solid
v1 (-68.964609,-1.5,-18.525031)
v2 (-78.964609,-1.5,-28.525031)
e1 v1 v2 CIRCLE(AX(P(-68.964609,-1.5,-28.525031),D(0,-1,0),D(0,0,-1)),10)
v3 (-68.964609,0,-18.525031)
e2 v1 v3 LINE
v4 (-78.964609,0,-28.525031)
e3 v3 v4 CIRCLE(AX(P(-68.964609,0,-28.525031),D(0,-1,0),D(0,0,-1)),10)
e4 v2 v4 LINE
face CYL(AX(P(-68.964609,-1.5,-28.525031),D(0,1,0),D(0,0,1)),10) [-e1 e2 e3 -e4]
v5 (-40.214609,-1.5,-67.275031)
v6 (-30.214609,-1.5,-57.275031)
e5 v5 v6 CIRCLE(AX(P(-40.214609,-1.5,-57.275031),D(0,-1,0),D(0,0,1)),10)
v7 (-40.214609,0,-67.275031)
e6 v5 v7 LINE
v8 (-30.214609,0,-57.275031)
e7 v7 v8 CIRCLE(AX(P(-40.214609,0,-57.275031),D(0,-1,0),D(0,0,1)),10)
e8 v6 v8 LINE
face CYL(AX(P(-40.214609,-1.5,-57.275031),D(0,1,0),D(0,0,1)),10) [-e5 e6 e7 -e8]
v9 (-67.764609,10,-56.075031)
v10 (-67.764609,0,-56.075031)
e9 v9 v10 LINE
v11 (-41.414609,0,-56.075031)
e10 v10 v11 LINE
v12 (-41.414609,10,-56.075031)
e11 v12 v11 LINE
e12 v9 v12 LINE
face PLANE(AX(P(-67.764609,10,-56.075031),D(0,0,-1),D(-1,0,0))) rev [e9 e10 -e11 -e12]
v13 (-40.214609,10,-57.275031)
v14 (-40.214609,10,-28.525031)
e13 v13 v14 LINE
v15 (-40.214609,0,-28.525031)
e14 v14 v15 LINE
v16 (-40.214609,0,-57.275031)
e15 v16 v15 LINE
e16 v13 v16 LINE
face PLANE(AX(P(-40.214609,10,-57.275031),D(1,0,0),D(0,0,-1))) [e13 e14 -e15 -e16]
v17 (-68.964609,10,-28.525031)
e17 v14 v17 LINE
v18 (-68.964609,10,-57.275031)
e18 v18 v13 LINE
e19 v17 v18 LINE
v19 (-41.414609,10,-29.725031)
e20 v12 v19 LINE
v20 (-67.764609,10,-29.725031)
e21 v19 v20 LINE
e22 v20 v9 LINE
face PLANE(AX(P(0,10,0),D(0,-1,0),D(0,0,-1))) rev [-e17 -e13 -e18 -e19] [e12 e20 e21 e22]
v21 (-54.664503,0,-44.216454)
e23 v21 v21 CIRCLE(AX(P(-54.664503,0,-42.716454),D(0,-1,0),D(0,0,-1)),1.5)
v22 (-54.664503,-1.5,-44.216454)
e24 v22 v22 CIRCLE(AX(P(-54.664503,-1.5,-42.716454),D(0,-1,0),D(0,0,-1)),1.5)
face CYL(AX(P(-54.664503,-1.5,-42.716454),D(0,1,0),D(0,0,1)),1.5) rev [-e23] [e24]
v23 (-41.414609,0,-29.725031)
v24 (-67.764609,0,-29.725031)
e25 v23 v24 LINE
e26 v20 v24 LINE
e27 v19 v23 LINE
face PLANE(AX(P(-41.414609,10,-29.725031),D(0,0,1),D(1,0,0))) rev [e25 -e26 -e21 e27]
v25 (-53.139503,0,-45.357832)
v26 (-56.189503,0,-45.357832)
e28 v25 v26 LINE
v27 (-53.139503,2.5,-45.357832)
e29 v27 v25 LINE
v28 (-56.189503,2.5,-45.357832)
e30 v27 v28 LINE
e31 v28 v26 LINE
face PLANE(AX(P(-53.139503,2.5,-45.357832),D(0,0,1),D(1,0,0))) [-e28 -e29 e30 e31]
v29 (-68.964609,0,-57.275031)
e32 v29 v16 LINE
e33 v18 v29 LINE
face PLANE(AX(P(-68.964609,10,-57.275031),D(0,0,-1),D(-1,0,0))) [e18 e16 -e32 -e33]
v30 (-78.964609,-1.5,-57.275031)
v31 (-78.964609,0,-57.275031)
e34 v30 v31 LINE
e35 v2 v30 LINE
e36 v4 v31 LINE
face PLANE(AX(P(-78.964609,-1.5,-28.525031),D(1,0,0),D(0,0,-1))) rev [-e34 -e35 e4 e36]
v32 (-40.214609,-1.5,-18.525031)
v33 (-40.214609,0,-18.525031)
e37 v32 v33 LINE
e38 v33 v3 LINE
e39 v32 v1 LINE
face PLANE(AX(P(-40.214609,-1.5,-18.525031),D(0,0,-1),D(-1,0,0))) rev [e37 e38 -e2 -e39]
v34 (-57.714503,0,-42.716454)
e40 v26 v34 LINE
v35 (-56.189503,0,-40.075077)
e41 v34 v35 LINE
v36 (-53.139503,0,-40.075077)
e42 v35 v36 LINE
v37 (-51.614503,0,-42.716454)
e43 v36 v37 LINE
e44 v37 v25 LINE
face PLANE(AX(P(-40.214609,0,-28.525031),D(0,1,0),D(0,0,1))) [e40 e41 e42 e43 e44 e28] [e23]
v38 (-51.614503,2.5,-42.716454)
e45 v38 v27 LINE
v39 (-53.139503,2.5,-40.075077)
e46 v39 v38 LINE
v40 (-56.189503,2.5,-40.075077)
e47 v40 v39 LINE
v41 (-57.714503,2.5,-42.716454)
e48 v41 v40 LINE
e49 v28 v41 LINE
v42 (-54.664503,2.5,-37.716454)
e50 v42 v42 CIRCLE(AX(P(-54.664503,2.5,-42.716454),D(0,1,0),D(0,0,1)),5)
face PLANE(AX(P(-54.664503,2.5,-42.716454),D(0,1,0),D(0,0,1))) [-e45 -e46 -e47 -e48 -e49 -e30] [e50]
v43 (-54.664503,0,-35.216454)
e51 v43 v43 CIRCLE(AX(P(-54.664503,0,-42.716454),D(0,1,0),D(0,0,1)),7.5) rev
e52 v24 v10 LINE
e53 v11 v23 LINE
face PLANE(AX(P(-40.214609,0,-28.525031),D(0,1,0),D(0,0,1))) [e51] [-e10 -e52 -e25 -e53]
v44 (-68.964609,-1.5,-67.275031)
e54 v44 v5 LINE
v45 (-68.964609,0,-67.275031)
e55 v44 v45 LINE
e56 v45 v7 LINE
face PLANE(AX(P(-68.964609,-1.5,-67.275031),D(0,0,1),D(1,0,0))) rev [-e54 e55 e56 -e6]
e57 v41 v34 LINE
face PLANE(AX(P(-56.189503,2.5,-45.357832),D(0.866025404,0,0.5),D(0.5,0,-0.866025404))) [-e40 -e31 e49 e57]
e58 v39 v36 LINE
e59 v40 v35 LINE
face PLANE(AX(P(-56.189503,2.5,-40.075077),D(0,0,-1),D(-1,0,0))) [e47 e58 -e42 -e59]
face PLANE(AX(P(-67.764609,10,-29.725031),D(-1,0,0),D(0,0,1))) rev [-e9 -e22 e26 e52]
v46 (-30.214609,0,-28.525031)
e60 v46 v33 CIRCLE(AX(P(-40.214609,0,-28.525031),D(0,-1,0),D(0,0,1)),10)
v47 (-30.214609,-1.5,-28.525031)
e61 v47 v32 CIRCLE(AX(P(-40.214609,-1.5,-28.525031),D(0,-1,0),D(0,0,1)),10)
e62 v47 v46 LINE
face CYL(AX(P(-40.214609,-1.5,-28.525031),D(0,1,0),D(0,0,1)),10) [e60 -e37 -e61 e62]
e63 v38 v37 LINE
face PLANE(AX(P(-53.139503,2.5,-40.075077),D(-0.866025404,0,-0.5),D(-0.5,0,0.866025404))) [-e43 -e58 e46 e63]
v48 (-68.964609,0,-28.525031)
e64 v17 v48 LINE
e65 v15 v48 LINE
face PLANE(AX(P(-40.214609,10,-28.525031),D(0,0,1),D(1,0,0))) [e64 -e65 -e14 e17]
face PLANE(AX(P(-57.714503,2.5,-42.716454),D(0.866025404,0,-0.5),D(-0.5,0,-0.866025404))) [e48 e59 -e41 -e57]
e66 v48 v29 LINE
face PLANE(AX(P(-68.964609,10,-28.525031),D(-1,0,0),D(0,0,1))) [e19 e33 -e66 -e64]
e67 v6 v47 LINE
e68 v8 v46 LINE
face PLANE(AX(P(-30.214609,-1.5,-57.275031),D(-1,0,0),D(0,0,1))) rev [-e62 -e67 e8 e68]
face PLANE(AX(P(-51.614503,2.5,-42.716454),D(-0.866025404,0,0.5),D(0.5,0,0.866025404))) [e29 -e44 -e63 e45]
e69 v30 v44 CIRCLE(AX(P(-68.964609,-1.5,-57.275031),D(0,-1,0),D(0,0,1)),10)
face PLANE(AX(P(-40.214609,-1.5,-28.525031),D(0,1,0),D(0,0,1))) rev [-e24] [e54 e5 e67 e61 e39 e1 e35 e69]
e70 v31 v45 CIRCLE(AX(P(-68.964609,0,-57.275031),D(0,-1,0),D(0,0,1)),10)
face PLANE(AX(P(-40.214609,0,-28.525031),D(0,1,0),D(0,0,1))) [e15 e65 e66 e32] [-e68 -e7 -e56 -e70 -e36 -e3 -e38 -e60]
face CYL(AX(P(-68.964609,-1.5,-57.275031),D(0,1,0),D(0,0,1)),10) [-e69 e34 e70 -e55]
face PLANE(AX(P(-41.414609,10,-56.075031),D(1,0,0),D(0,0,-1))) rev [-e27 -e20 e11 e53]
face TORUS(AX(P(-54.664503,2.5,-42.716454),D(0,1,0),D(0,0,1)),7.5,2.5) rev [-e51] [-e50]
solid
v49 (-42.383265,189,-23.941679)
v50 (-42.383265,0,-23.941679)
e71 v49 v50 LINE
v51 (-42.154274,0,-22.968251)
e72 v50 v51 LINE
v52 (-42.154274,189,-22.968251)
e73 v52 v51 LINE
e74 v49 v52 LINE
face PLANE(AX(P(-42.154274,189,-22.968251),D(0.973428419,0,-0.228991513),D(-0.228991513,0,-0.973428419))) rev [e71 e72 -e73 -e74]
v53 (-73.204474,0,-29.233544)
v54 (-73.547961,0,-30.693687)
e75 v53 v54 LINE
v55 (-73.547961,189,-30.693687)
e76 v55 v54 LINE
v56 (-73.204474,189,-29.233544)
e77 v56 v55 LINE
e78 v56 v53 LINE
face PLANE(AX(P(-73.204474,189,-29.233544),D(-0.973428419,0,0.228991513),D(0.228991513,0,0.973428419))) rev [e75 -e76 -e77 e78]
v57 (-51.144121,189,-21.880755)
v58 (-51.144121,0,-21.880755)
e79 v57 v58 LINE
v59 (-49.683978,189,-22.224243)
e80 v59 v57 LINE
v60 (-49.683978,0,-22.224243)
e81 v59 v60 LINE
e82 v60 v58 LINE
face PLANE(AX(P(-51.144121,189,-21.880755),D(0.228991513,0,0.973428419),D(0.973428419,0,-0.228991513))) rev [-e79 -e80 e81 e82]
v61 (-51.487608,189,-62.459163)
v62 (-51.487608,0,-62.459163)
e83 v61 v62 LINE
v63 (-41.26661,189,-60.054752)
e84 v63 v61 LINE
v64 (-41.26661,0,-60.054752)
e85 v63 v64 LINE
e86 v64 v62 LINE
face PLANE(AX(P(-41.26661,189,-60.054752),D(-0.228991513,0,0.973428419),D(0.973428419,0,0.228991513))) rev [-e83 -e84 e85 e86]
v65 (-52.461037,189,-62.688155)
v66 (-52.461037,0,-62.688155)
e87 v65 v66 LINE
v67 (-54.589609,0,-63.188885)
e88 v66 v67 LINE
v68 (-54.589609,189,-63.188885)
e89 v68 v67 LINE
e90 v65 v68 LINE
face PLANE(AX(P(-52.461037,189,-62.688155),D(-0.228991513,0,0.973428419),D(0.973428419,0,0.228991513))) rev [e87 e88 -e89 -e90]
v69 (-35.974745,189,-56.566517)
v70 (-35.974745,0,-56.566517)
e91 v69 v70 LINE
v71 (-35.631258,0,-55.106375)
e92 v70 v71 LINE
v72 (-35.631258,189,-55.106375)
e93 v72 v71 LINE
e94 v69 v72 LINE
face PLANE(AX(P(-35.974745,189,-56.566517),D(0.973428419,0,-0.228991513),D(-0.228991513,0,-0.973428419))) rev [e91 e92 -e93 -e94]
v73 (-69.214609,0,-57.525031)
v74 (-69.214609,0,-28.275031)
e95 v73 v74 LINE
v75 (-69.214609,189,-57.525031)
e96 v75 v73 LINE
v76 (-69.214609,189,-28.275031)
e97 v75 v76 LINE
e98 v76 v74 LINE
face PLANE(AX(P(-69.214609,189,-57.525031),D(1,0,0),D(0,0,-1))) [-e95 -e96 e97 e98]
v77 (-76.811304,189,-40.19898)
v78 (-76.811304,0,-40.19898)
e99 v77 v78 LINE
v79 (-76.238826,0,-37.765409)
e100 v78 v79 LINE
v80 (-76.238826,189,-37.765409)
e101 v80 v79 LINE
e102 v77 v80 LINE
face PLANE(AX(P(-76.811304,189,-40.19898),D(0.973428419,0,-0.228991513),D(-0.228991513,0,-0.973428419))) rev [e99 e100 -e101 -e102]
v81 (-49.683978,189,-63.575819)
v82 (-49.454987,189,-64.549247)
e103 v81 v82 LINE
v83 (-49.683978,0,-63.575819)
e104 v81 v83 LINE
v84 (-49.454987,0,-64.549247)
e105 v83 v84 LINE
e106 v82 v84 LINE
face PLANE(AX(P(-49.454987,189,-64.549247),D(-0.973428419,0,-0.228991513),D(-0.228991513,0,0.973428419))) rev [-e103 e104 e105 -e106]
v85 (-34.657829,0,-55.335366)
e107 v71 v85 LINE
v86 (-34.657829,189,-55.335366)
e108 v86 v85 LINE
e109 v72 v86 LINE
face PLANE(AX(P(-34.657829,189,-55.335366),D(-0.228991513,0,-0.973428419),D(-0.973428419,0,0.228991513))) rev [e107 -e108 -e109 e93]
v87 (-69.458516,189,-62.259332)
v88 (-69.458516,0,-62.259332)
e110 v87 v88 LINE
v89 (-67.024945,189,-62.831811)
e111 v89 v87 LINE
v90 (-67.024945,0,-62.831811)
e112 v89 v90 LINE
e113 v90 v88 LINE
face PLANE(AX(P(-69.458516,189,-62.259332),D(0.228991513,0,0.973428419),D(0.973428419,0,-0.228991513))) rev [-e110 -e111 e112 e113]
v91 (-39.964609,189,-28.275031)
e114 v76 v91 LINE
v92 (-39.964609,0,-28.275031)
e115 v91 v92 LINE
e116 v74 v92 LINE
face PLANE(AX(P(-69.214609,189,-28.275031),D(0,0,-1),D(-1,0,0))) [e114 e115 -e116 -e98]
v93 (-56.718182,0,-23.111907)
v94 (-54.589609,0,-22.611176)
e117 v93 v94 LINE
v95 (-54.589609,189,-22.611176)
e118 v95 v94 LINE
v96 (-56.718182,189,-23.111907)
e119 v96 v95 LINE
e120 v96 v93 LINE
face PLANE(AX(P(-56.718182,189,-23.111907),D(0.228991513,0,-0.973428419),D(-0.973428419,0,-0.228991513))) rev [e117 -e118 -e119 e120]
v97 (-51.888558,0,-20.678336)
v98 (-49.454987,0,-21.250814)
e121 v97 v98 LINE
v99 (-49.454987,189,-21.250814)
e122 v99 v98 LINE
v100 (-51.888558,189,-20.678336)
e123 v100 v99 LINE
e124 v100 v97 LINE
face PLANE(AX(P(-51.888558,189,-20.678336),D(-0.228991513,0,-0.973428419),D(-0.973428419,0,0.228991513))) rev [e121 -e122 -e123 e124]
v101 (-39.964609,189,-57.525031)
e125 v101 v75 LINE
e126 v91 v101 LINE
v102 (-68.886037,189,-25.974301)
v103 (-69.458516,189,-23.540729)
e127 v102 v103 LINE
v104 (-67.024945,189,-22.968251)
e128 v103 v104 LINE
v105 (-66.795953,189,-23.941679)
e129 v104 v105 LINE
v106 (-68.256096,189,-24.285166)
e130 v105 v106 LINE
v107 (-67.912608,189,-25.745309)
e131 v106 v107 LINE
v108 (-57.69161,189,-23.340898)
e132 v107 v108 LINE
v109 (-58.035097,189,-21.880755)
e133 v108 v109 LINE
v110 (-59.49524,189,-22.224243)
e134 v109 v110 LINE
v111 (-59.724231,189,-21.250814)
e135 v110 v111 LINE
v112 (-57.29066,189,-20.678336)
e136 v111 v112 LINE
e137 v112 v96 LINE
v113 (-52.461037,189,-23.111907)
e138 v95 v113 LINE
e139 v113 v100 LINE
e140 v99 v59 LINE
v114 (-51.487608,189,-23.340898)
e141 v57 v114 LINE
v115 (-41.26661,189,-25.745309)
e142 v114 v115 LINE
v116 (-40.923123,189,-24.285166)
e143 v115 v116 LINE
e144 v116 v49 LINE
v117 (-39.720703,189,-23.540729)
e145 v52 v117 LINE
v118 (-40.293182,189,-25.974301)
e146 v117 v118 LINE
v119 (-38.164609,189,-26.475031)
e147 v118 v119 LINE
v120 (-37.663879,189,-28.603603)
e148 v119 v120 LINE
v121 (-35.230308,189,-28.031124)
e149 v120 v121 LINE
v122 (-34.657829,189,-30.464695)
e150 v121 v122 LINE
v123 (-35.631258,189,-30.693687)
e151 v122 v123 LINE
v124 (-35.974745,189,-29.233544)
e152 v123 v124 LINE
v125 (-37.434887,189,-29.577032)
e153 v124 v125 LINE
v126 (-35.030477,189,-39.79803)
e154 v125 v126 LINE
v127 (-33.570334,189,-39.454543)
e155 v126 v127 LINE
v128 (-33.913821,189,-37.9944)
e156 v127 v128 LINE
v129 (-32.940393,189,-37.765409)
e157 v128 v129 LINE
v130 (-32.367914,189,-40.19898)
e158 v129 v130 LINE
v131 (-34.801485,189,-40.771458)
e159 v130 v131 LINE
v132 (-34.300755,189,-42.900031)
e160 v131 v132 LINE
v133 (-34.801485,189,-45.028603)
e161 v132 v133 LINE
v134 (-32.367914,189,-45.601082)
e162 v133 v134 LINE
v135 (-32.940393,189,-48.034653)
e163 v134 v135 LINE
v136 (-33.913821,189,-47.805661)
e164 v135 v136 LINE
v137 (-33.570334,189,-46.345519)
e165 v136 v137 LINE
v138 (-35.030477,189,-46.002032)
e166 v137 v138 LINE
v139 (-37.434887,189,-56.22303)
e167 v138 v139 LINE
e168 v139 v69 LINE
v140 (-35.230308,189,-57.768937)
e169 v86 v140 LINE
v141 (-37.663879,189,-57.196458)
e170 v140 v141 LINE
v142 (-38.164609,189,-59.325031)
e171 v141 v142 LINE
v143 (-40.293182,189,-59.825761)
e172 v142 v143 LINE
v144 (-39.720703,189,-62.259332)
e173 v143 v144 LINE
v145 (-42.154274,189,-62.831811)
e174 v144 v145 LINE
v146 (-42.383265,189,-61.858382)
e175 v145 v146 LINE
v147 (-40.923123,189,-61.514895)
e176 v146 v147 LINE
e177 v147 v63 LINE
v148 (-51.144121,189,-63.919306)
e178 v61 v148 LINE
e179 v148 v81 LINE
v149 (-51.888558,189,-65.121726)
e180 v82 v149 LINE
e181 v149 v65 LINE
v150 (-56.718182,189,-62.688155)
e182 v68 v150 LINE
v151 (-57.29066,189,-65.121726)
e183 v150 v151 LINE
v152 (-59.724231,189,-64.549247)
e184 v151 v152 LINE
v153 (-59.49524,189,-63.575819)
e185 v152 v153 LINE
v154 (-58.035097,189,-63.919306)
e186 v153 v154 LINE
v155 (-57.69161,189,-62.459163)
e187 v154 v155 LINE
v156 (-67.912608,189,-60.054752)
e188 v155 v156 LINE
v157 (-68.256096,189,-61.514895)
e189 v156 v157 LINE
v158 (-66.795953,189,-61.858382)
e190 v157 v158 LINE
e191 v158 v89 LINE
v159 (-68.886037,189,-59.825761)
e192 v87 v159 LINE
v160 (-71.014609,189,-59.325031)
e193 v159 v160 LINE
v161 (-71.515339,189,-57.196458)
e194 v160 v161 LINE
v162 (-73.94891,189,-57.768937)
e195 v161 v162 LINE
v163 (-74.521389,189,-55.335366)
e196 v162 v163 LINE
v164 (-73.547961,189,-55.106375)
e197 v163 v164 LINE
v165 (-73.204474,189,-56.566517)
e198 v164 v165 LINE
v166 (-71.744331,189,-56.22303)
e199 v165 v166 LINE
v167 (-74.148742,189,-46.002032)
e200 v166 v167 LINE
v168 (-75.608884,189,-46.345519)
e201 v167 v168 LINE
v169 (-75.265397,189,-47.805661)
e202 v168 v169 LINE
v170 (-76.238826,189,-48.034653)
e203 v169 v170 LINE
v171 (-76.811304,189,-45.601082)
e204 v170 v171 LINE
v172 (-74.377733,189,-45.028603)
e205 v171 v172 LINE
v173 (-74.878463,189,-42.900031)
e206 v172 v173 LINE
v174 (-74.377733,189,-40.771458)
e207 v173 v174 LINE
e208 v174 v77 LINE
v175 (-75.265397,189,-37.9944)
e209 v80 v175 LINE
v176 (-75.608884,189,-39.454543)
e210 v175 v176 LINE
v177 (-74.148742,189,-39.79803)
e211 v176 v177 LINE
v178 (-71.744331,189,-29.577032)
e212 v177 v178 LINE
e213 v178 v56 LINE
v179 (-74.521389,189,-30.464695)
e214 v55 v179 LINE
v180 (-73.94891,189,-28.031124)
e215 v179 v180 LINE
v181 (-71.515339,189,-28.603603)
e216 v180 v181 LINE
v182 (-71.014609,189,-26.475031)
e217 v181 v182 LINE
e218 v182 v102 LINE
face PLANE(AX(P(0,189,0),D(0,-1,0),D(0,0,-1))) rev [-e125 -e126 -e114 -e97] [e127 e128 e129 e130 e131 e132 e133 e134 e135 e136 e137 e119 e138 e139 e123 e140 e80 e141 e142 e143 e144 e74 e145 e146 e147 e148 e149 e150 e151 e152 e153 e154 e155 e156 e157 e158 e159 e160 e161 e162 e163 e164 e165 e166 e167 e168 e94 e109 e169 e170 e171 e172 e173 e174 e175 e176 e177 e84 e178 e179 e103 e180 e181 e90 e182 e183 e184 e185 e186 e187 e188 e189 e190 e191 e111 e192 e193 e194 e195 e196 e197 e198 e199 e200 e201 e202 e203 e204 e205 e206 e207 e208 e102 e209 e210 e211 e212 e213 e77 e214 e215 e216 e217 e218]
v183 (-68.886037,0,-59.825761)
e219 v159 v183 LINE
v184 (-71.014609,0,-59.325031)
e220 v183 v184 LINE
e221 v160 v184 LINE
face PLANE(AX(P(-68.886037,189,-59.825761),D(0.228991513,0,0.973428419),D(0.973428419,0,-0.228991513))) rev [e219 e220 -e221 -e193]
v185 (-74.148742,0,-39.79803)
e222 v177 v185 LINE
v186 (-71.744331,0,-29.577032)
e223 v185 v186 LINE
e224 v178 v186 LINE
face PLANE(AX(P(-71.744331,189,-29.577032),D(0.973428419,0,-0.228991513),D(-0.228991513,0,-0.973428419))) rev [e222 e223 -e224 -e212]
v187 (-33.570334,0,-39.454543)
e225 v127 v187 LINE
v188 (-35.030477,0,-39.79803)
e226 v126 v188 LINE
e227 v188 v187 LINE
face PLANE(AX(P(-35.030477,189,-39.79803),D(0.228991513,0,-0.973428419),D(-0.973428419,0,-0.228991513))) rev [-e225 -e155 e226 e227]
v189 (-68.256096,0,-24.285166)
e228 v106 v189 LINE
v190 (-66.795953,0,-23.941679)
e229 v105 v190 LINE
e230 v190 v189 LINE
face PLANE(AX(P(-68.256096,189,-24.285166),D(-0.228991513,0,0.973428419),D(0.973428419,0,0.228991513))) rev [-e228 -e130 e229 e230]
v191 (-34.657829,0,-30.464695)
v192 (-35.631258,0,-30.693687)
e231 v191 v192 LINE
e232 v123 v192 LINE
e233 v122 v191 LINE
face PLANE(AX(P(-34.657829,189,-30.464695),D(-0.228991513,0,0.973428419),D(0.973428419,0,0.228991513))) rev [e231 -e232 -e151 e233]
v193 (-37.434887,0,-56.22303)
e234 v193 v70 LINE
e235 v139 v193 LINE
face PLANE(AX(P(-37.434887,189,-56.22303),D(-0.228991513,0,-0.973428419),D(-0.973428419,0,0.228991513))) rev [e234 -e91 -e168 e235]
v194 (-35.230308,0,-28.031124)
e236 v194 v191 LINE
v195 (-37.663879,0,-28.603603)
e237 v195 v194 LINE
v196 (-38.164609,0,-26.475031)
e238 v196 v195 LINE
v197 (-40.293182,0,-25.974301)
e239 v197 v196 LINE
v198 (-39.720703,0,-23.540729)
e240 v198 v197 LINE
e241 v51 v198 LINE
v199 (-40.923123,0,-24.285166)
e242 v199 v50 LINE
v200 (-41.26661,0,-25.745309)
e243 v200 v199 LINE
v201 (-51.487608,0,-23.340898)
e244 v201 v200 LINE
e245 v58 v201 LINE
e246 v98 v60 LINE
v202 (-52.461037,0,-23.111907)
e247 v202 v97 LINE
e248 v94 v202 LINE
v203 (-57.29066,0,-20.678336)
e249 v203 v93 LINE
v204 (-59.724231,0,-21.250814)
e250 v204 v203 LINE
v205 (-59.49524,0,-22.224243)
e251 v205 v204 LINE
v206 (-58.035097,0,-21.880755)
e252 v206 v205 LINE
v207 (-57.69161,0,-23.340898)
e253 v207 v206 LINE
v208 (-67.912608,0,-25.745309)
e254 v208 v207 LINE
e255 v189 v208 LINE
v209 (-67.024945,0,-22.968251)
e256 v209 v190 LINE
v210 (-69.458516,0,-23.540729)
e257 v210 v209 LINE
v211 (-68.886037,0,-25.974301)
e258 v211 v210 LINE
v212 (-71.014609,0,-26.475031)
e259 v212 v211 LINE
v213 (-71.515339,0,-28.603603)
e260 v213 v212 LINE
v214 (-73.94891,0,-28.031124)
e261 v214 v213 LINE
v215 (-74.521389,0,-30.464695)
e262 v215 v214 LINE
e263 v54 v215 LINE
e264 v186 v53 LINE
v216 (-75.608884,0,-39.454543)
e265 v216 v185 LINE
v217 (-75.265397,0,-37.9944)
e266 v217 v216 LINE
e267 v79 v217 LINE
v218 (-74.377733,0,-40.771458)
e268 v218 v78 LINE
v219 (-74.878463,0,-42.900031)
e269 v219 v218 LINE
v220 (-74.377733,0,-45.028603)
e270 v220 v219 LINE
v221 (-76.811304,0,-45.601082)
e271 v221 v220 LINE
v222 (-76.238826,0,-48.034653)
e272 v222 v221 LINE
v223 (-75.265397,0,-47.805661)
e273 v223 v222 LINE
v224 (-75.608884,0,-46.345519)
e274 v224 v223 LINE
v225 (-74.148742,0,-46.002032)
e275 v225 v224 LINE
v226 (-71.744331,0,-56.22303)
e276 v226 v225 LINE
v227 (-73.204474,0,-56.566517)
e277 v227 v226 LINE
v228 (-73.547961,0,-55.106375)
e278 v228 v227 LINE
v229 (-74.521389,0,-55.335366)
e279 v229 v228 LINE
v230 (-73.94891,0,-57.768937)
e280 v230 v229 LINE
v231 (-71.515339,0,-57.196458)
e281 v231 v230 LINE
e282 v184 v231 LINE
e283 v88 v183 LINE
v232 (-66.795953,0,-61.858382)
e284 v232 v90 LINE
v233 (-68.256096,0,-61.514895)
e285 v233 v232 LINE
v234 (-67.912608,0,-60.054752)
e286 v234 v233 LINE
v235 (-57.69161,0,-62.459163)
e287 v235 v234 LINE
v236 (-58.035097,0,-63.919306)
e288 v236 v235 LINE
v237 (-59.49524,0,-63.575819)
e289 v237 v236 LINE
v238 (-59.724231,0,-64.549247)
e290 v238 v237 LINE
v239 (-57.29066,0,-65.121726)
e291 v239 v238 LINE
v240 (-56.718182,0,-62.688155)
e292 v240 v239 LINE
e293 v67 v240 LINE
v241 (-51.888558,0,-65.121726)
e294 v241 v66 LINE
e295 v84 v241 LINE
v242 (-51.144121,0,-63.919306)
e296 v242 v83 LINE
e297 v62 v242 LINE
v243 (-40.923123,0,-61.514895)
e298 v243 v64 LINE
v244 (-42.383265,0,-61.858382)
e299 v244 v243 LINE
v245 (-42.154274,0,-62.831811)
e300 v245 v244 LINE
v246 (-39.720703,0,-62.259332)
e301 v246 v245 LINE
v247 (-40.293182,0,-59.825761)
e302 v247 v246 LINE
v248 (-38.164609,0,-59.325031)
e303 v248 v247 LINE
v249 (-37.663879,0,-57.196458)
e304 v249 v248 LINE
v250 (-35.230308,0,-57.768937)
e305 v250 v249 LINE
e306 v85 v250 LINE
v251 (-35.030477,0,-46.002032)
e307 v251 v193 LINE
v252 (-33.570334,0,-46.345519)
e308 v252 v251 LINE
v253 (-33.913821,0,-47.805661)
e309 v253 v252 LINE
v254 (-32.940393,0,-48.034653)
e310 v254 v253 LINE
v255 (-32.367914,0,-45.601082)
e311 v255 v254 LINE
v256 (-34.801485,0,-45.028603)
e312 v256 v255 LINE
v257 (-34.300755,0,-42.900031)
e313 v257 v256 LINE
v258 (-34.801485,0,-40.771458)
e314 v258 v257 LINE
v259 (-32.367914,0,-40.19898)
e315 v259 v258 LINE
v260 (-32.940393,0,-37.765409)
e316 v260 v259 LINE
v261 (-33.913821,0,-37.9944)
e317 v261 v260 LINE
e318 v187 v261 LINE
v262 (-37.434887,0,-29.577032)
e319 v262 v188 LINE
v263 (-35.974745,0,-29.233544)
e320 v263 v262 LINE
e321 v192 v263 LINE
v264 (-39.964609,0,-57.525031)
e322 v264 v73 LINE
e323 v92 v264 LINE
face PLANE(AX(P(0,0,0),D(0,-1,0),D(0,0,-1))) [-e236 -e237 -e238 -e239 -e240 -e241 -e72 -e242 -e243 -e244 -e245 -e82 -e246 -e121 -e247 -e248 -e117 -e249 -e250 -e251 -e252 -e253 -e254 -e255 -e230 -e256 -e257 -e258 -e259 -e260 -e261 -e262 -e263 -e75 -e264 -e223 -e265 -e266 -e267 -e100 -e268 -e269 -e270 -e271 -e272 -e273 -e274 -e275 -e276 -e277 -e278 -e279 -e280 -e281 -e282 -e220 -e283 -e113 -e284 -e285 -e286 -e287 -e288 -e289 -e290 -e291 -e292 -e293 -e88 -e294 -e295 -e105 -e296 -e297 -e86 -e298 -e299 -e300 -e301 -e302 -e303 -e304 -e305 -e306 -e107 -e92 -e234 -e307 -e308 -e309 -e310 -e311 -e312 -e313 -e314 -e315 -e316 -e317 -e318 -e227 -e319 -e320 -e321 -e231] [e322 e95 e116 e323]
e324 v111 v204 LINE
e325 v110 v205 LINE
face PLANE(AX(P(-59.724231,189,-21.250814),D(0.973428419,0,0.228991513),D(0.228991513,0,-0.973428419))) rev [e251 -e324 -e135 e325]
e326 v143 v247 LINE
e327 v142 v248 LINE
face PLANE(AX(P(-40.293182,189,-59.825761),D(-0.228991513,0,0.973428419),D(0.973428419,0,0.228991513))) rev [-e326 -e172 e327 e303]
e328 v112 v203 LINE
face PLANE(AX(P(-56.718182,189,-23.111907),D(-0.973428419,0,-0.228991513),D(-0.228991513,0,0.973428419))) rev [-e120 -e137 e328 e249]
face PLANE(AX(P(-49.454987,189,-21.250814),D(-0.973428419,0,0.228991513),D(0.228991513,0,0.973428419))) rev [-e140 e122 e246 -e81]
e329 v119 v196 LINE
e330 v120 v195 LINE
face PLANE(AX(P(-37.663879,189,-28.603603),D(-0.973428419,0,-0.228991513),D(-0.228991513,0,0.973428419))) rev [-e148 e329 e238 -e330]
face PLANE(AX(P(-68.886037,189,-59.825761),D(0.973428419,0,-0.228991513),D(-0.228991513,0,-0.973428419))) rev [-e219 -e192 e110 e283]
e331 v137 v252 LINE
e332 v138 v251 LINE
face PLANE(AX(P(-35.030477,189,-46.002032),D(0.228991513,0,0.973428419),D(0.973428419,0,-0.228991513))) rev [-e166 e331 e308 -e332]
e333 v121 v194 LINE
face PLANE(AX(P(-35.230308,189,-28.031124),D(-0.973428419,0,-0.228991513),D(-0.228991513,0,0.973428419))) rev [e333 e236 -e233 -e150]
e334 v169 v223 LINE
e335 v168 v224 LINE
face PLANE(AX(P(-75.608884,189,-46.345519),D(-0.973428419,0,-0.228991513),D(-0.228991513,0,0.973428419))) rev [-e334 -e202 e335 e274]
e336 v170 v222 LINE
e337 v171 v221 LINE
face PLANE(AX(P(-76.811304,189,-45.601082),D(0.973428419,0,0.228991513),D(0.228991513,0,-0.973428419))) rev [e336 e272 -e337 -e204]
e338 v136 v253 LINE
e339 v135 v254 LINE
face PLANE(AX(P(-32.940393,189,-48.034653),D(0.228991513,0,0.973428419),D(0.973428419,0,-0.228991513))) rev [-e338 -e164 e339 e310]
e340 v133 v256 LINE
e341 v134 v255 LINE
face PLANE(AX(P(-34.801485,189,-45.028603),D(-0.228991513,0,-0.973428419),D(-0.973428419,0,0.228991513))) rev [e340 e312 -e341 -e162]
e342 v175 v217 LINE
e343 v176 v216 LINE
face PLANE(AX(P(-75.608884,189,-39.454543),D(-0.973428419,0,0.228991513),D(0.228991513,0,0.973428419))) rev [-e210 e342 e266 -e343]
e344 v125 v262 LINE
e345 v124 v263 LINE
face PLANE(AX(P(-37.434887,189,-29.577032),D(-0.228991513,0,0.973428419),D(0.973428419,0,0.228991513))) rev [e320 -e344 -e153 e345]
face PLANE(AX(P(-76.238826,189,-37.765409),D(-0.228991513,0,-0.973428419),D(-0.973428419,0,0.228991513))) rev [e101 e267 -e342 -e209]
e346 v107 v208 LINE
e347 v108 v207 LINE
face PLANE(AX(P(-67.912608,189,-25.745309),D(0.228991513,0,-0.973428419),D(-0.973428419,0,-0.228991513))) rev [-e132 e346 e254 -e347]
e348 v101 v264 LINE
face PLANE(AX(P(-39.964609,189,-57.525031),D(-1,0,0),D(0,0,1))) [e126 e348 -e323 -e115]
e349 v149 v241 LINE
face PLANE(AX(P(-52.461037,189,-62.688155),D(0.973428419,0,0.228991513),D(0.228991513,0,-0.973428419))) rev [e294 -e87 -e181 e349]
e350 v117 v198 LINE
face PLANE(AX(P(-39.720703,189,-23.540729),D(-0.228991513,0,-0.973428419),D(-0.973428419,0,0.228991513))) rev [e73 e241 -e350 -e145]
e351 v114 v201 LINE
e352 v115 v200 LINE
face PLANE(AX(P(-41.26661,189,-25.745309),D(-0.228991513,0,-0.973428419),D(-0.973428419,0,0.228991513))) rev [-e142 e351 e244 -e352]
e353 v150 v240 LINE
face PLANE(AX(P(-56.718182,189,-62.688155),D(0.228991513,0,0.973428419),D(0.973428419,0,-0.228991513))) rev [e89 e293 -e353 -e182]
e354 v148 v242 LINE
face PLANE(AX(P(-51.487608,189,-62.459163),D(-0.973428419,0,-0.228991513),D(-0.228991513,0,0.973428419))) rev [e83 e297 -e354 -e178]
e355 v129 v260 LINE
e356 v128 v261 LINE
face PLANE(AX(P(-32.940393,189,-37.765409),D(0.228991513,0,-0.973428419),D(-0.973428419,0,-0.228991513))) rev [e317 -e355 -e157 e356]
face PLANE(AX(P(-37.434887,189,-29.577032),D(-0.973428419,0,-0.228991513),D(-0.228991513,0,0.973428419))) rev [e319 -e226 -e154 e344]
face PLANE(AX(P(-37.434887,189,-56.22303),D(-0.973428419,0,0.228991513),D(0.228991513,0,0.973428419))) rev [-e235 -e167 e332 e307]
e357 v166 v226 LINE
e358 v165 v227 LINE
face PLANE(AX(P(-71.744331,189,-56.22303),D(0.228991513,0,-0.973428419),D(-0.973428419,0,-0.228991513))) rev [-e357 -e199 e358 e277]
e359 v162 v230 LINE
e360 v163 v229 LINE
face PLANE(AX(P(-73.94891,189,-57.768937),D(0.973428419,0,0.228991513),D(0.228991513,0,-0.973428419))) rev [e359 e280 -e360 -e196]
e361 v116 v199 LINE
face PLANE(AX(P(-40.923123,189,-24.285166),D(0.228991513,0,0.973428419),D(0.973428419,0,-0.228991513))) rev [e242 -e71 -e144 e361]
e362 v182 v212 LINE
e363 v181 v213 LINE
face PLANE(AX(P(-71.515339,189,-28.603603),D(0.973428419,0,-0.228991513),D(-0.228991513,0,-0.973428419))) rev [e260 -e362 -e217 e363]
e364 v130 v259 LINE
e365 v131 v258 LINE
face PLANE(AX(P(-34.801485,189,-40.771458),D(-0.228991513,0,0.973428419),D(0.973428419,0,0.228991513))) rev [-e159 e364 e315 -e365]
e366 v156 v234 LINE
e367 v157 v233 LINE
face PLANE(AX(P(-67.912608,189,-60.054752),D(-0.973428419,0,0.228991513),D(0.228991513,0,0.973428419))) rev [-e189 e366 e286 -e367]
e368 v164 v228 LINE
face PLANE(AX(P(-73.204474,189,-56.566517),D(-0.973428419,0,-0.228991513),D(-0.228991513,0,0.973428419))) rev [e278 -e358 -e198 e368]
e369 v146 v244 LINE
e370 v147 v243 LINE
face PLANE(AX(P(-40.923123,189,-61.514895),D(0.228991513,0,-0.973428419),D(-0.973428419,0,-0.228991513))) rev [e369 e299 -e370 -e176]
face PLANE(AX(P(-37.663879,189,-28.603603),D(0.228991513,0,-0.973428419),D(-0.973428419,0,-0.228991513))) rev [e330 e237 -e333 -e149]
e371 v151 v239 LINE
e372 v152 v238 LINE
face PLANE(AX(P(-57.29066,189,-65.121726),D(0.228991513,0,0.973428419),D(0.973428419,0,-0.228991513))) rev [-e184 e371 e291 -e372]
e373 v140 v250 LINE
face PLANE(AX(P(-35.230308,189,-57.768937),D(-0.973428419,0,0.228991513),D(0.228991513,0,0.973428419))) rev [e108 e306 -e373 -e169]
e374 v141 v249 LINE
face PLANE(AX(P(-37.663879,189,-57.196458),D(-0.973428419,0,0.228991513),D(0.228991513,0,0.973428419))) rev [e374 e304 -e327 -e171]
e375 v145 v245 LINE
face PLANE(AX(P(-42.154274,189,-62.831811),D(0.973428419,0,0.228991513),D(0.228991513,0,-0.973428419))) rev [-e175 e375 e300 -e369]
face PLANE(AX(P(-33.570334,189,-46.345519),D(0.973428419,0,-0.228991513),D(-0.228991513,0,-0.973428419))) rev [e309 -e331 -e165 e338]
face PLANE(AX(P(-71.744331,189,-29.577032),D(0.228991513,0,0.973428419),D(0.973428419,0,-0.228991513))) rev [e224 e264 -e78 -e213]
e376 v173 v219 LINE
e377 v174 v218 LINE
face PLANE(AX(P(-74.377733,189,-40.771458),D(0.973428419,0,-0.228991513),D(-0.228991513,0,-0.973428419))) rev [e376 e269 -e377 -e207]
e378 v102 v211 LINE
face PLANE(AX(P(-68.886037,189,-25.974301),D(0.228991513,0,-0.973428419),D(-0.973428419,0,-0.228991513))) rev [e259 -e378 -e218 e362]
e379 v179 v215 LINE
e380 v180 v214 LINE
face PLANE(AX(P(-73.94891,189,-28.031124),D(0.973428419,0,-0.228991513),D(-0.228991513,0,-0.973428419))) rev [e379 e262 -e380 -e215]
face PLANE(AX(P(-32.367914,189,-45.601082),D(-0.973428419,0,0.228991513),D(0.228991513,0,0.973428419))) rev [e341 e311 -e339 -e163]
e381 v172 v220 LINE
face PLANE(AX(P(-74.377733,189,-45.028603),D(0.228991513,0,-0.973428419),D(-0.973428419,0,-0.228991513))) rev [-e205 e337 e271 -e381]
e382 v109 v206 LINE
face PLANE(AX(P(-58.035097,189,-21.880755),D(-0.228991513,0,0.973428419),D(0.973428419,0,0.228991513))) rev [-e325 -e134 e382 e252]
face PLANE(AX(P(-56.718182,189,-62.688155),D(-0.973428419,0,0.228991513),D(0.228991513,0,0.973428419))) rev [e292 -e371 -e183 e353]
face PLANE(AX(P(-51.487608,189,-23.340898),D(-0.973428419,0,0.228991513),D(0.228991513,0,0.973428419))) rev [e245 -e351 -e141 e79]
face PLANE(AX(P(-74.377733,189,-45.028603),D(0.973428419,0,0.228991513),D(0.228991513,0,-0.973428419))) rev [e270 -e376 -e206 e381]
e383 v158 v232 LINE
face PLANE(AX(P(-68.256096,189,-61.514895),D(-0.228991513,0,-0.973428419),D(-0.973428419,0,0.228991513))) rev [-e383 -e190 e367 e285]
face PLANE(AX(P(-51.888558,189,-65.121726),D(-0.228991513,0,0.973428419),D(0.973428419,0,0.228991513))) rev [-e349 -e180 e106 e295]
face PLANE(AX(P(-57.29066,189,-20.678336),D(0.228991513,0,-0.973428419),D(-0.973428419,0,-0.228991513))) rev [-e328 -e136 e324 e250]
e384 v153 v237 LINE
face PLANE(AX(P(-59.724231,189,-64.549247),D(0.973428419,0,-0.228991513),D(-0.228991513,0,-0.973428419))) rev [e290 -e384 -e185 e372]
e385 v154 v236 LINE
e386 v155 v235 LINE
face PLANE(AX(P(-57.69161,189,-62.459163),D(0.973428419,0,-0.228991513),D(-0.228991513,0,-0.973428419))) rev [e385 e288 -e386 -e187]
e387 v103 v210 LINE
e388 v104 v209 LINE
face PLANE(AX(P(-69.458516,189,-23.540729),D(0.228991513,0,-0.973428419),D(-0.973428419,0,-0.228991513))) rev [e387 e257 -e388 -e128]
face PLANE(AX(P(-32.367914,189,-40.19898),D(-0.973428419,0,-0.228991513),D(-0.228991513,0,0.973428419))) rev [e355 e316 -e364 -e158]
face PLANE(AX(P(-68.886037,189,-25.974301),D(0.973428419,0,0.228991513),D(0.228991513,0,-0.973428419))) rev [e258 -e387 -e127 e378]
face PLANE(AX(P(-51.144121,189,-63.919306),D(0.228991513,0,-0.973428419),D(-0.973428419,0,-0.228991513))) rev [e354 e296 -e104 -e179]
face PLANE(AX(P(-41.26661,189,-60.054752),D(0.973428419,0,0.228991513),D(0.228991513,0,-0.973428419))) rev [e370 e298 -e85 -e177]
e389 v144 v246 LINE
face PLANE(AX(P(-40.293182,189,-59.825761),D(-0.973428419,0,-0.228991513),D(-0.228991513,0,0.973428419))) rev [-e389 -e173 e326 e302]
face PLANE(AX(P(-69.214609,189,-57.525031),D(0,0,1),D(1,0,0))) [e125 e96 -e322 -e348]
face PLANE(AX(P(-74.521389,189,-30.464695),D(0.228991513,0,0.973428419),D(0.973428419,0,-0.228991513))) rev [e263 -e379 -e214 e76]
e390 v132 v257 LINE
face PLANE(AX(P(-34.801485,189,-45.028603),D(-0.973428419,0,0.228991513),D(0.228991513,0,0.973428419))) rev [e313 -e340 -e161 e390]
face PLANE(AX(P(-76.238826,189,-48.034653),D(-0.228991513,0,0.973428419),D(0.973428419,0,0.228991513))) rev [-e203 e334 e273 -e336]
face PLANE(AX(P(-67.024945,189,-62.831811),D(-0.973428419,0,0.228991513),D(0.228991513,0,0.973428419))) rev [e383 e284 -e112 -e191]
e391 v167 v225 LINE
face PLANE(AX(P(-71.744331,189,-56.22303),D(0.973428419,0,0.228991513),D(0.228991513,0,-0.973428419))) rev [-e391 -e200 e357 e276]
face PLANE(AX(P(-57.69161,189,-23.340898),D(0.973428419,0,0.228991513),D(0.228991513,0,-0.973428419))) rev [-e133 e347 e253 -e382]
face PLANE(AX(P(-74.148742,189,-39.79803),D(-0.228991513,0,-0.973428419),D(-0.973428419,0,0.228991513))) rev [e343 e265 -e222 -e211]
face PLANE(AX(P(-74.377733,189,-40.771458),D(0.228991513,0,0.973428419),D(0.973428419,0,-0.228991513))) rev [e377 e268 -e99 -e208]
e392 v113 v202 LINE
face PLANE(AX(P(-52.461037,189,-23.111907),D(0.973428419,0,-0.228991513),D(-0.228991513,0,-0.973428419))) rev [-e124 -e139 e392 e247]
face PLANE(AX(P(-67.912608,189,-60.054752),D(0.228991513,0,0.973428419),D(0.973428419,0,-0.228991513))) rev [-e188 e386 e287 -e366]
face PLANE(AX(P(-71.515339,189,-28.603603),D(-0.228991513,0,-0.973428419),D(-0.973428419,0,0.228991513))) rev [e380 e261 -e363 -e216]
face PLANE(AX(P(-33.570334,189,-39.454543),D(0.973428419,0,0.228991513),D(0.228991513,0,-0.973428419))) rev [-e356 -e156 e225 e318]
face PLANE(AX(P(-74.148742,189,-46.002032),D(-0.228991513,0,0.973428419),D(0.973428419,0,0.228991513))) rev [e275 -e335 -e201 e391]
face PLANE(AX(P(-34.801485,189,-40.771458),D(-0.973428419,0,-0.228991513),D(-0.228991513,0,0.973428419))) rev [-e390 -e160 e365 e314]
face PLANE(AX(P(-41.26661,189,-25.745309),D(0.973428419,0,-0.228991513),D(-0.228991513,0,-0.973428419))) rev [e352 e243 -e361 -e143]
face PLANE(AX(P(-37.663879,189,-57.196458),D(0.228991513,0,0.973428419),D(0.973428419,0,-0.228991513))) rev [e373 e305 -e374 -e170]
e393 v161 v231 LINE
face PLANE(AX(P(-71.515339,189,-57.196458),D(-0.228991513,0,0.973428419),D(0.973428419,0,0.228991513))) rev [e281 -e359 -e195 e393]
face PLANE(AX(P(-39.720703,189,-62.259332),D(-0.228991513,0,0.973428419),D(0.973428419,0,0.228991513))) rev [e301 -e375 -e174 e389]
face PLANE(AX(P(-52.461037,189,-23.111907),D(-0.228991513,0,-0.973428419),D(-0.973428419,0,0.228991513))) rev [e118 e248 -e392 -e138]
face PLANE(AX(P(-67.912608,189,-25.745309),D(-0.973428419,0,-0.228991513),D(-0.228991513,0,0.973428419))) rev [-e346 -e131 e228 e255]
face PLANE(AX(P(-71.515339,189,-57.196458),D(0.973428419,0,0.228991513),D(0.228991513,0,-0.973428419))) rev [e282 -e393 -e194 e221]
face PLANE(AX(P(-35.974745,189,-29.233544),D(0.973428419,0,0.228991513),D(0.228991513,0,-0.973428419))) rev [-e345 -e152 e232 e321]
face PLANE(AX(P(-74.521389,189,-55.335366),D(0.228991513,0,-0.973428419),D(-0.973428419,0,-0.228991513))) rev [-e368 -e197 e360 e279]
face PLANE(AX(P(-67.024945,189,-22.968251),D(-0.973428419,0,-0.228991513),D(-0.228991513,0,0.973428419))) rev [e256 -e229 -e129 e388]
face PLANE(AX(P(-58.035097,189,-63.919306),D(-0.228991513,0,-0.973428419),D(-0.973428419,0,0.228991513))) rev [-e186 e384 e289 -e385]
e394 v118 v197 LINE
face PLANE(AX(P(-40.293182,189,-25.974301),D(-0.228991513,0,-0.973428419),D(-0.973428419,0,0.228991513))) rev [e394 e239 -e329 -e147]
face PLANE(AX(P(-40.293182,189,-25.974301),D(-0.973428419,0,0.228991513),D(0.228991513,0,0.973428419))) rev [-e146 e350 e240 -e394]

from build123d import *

# Parameters (mm, degrees)
SKETCH1_W           = 29.25
SKETCH1_H           = 29.25
BOSS_EXTRUDE1_DEPTH = 189
SKETCH2_W           = 28.75
SKETCH2_H           = 28.75
SKETCH2_W_2         = 26.35
SKETCH2_H_2         = 26.35
BOSS_EXTRUDE2_DEPTH = 10
SKETCH3_R           = 1.5
BOSS_EXTRUDE3_DEPTH = 1.5
SKETCH4_R           = 5
BOSS_EXTRUDE4_DEPTH = 2.5
FILLET1_R           = 2.5


with BuildPart() as part:
    # Sketch1 → Boss-Extrude1 (new body)
    with BuildSketch(Plane(origin=(0, 0, 0), x_dir=(1, 0, 0), z_dir=(0, 1, 0))):
        Polygon((-74.377733291, 45.028603114), (-74.878463495, 42.900030733), (-74.377733291, 40.771458351), (-76.811304338, 40.198979568), (-76.238825555, 37.76540852), (-75.265397136, 37.994400034), (-75.608884406, 39.454542662), (-74.148741777, 39.798029932), (-71.744330888, 29.577031533), (-73.204473516, 29.233544263), (-73.547960786, 30.693686892), (-74.521389205, 30.464695378), (-73.948910422, 28.031124331), (-71.515339374, 28.603603114), (-71.01460917, 26.475030733), (-68.886036789, 25.974300529), (-69.458515572, 23.540729481), (-67.024944525, 22.968250698), (-66.795953011, 23.941679117), (-68.25609564, 24.285166387), (-67.91260837, 25.745309015), (-57.691609971, 23.340898126), (-58.035097241, 21.880755497), (-59.495239869, 22.224242767), (-59.724231382, 21.250814348), (-57.290660335, 20.678335565), (-56.718181552, 23.111906612), (-54.58960917, 22.611176408), (-52.461036789, 23.111906612), (-51.888558005, 20.678335565), (-49.454986958, 21.250814348), (-49.683978471, 22.224242767), (-51.1441211, 21.880755497), (-51.48760837, 23.340898126), (-41.266609971, 25.745309015), (-40.923122701, 24.285166387), (-42.383265329, 23.941679117), (-42.154273816, 22.968250698), (-39.720702769, 23.540729481), (-40.293181552, 25.974300529), (-38.16460917, 26.475030733), (-37.663878966, 28.603603114), (-35.230307919, 28.031124331), (-34.657829136, 30.464695378), (-35.631257555, 30.693686892), (-35.974744824, 29.233544263), (-37.434887453, 29.577031533), (-35.030476563, 39.798029932), (-33.570333935, 39.454542662), (-33.913821205, 37.994400034), (-32.940392786, 37.76540852), (-32.367914002, 40.198979568), (-34.80148505, 40.771458351), (-34.300754846, 42.900030733), (-34.80148505, 45.028603114), (-32.367914002, 45.601081897), (-32.940392786, 48.034652945), (-33.913821205, 47.805661431), (-33.570333935, 46.345518803), (-35.030476563, 46.002031533), (-37.434887453, 56.223029932), (-35.974744824, 56.566517202), (-35.631257555, 55.106374574), (-34.657829136, 55.335366087), (-35.230307919, 57.768937134), (-37.663878966, 57.196458351), (-38.16460917, 59.325030733), (-40.293181552, 59.825760937), (-39.720702769, 62.259331984), (-42.154273816, 62.831810767), (-42.383265329, 61.858382348), (-40.923122701, 61.514895078), (-41.266609971, 60.05475245), (-51.48760837, 62.45916334), (-51.1441211, 63.919305968), (-49.683978471, 63.575818698), (-49.454986958, 64.549247117), (-51.888558005, 65.1217259), (-52.461036789, 62.688154853), (-54.58960917, 63.188885057), (-56.718181552, 62.688154853), (-57.290660335, 65.1217259), (-59.724231382, 64.549247117), (-59.495239869, 63.575818698), (-58.035097241, 63.919305968), (-57.691609971, 62.45916334), (-67.91260837, 60.05475245), (-68.25609564, 61.514895078), (-66.795953011, 61.858382348), (-67.024944525, 62.831810767), (-69.458515572, 62.259331984), (-68.886036789, 59.825760937), (-71.01460917, 59.325030733), (-71.515339374, 57.196458351), (-73.948910422, 57.768937134), (-74.521389205, 55.335366087), (-73.547960786, 55.106374574), (-73.204473516, 56.566517202), (-71.744330888, 56.223029932), (-74.148741777, 46.002031533), (-75.608884406, 46.345518803), (-75.265397136, 47.805661431), (-76.238825555, 48.034652945), (-76.811304338, 45.601081897), align=None)
        with Locations((-54.58960917, 42.900030733)):
            Rectangle(SKETCH1_W, SKETCH1_H, mode=Mode.SUBTRACT)
    extrude(amount=BOSS_EXTRUDE1_DEPTH)


with BuildPart() as body_2:
    # Sketch2 → Boss-Extrude2 (new body)
    with BuildSketch(Plane.XZ):
        with Locations((-54.58960917, -42.900030733)):
            Rectangle(SKETCH2_W, SKETCH2_H)
        with Locations((-54.58960917, -42.900030733)):
            Rectangle(SKETCH2_W_2, SKETCH2_H_2, mode=Mode.SUBTRACT)
    extrude(amount=-BOSS_EXTRUDE2_DEPTH)

    # Sketch3 → Boss-Extrude3 (add)
    with BuildSketch(Plane.XZ):
        with BuildLine():
            Line((-68.96460917, -67.275030733), (-40.21460917, -67.275030733))
            ThreePointArc((-40.21460917, -67.275030733), (-33.143541358, -64.346098544), (-30.21460917, -57.275030733))
            Line((-30.21460917, -57.275030733), (-30.21460917, -28.525030733))
            ThreePointArc((-30.21460917, -28.525030733), (-33.143541358, -21.453962921), (-40.21460917, -18.525030733))
            Line((-40.21460917, -18.525030733), (-68.96460917, -18.525030733))
            ThreePointArc((-68.96460917, -18.525030733), (-76.035676982, -21.453962921), (-78.96460917, -28.525030733))
            Line((-78.96460917, -28.525030733), (-78.96460917, -57.275030733))
            ThreePointArc((-78.96460917, -57.275030733), (-76.035676982, -64.346098544), (-68.96460917, -67.275030733))
        make_face()
        with Locations(Location((-54.664503297, -42.716454345, 0), (0, 0, 270))):
            Circle(SKETCH3_R, mode=Mode.SUBTRACT)
    extrude(amount=BOSS_EXTRUDE3_DEPTH)

    # Sketch4 → Boss-Extrude4 (add)
    with BuildSketch(Plane(origin=(0, 0, 0), x_dir=(1, 0, 0), z_dir=(0, 1, 0))):
        with Locations(Location((-54.664503297, 42.716454345, 0), (0, 0, 270))):
            Circle(SKETCH4_R)
        Polygon((-51.614503297, 42.716454345), (-53.139503297, 45.357831827), (-56.189503297, 45.357831827), (-57.714503297, 42.716454345), (-56.189503297, 40.075076863), (-53.139503297, 40.075076863), align=None, mode=Mode.SUBTRACT)
    extrude(amount=BOSS_EXTRUDE4_DEPTH)

    # Fillet1
    fillet1_edges = [body_2.edges().sort_by_distance(p)[0] for p in [
        (-54.664503297, 0, -47.716454345),
    ]]
    fillet(fillet1_edges, radius=FILLET1_R - 0.0001)  # a hair under: the kernel refuses the full size


solid = Compound([part.part, body_2.part])
